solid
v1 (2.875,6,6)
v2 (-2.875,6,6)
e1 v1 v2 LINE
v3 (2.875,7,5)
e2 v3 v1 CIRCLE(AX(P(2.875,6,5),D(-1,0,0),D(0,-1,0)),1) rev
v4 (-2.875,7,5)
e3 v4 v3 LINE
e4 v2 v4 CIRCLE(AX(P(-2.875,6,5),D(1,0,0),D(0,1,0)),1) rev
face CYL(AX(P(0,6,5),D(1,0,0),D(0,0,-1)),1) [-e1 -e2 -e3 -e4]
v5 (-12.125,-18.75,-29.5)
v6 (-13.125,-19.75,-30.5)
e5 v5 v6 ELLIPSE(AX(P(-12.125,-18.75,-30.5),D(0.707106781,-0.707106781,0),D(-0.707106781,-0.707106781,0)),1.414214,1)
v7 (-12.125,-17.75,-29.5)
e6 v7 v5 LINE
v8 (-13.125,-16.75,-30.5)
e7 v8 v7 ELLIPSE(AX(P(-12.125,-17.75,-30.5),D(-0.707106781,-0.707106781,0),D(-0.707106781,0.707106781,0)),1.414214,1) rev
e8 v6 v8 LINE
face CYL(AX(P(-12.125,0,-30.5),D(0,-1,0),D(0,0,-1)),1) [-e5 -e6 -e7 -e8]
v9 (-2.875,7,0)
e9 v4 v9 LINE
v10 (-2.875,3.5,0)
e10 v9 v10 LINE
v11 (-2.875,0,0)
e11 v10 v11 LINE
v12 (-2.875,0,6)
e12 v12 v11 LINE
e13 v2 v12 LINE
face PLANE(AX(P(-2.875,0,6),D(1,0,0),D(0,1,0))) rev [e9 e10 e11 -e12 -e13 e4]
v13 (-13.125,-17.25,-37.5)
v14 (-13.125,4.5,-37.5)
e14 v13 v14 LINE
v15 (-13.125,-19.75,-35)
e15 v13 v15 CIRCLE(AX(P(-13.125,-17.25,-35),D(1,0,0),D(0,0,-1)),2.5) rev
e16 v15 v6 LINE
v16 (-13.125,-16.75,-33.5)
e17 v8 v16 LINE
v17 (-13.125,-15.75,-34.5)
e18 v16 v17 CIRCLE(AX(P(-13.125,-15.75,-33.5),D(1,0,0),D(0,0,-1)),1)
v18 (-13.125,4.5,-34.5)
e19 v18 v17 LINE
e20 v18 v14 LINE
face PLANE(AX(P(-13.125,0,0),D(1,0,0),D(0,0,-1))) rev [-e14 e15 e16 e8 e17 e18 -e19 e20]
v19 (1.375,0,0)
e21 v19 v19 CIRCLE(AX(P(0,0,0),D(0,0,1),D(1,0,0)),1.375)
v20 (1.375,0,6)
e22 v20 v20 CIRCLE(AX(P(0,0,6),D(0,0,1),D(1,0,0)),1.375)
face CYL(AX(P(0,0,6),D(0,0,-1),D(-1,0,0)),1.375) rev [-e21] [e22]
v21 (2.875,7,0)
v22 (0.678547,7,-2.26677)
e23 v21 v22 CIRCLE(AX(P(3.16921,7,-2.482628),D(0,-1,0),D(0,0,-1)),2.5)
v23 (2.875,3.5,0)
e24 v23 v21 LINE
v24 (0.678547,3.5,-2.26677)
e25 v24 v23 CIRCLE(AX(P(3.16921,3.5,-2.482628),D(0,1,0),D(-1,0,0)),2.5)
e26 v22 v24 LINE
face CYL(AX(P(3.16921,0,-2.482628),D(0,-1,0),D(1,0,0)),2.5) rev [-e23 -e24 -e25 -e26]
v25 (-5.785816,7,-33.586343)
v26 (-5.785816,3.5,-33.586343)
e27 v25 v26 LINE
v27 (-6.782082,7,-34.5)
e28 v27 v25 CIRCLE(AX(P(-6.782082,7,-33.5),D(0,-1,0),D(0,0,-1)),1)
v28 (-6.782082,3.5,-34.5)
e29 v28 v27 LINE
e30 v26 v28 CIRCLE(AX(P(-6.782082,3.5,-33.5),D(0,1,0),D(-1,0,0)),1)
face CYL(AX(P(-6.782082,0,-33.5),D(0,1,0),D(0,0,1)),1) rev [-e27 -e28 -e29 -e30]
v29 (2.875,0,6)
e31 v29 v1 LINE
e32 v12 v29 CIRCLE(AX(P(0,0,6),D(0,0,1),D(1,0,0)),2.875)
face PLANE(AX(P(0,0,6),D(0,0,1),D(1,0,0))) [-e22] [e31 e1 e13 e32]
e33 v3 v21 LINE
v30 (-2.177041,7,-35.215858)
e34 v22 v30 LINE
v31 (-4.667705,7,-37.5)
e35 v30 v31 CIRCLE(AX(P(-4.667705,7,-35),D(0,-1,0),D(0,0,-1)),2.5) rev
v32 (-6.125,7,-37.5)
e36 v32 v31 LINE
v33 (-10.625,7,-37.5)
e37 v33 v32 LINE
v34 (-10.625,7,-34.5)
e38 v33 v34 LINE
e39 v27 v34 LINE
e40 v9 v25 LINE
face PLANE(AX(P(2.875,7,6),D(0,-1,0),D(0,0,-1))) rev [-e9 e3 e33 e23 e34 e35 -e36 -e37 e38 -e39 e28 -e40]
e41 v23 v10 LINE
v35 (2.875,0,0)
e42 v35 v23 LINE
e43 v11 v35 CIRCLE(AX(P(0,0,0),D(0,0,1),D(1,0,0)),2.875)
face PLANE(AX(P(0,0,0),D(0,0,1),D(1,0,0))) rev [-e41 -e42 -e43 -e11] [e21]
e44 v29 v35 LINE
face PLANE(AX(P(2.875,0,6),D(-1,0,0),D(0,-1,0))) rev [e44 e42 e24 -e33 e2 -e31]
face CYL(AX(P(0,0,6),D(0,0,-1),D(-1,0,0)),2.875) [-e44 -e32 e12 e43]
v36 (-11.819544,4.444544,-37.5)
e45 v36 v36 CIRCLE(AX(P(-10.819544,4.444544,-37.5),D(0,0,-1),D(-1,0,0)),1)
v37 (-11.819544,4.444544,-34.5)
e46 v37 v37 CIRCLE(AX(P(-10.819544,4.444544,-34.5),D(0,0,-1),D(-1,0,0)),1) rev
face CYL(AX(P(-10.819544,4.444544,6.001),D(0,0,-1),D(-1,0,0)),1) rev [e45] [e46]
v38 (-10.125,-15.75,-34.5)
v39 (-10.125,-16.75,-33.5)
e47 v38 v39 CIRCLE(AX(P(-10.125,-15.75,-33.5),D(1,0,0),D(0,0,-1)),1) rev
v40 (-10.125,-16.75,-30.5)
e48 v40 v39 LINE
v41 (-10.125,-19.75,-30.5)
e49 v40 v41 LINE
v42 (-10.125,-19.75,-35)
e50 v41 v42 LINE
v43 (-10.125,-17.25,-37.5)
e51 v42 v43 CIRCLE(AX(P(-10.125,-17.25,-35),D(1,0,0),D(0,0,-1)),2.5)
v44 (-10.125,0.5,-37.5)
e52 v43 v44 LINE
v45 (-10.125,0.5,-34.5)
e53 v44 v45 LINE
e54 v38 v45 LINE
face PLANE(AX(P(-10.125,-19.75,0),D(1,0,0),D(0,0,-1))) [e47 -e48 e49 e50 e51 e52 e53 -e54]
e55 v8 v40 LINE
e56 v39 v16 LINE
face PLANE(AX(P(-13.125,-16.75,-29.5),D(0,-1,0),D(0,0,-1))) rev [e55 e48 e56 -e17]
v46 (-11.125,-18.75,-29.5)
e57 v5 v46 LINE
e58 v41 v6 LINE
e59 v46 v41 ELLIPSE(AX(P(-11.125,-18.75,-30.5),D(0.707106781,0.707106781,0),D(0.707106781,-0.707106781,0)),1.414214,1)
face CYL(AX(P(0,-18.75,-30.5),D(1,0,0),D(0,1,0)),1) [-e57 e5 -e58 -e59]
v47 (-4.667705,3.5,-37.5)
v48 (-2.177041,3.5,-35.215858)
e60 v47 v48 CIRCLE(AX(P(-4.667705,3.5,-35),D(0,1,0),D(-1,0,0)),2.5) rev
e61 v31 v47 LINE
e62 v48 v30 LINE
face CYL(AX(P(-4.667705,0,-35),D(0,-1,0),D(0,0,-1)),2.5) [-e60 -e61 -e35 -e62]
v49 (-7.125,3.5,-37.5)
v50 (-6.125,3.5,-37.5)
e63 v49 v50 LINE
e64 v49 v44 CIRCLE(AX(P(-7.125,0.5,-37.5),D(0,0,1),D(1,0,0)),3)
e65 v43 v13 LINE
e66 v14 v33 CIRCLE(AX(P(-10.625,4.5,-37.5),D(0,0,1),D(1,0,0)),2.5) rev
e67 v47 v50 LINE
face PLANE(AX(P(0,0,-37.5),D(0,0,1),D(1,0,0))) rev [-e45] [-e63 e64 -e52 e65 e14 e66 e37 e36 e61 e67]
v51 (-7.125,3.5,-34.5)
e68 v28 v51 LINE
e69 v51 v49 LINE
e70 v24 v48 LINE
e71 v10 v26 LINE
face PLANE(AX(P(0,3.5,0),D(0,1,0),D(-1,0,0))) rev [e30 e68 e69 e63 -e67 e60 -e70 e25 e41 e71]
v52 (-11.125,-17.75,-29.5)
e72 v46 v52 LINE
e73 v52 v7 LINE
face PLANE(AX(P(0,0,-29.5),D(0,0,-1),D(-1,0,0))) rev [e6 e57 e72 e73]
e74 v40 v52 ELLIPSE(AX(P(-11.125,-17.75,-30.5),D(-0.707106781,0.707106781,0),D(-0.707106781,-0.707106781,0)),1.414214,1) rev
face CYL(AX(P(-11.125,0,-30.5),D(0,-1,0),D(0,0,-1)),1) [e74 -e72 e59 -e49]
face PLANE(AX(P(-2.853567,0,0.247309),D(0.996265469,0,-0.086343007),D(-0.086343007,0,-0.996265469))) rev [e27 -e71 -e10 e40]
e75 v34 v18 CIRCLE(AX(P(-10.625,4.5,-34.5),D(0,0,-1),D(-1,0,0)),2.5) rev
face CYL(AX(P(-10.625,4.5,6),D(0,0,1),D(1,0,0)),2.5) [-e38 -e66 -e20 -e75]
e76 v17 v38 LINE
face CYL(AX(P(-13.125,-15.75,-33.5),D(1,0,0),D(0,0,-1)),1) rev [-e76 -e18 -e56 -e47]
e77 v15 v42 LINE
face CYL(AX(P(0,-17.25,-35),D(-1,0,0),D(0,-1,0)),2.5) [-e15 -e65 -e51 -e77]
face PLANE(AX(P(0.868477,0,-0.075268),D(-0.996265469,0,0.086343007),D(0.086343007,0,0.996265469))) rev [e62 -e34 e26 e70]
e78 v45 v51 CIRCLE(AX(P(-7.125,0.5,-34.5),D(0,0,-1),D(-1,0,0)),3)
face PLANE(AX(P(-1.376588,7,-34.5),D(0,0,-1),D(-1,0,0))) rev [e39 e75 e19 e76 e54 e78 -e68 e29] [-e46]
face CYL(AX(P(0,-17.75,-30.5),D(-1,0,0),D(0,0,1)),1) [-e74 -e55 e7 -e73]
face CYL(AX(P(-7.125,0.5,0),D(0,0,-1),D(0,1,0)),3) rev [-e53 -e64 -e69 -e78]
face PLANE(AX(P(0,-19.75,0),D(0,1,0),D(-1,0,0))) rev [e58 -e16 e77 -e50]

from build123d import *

# Parameters (mm, degrees)
SKETCH1_R           = 1.375
BOSS_EXTRUDE1_DEPTH = 6
BOSS_EXTRUDE2_START = -13.125
SKETCH9_W           = 3.5
SKETCH9_H           = 3
BOSS_EXTRUDE2_DEPTH = 7.26
BOSS_EXTRUDE3_START = -3.5
SKETCH10_W          = 3
SKETCH10_H          = 3
BOSS_EXTRUDE3_DEPTH = 23.25
SKETCH11_W          = 3
SKETCH11_H          = 3
BOSS_EXTRUDE4_DEPTH = 5
FILLET1_R           = 2.5
FILLET2_R           = 1
FILLET3_R           = 3
CUT_EXTRUDE1_REACH  = 51.544
SKETCH12_R          = 1


with BuildPart() as part:
    # Sketch1 → Boss-Extrude1 (new body)
    with BuildSketch(Plane(origin=(0, 0, 0), x_dir=(0, 1, 0), z_dir=(0, 0, 1))):
        with BuildLine():
            Line((0, 2.875), (7, 2.875))
            Line((7, 2.875), (7, -2.875))
            Line((7, -2.875), (0, -2.875))
            ThreePointArc((0, -2.875), (-2.875, 0), (0, 2.875))
        make_face()
        with Locations(Location((0, 0, 0), (0, 0, 270))):
            Circle(SKETCH1_R, mode=Mode.SUBTRACT)
    extrude(amount=BOSS_EXTRUDE1_DEPTH)

    # Sketch2 → Loft1 section 0
    with BuildSketch(Plane(origin=(0, 0, 0), x_dir=(1, 0, 0), z_dir=(0, 0, -1))):
        with BuildLine():
            Line((0.875, -7), (-2.875, -7))
            Line((-2.875, -7), (-2.875, -3.5))
            Line((-2.875, -3.5), (0.875, -3.5))
            Line((0.875, -3.5), (0.875, -7))
        make_face()
    # Sketch8 → Loft1 section 1
    with BuildSketch(Plane(origin=(0, 0, -37.5), x_dir=(-1, 0, 0), z_dir=(0, 0, -1))):
        with BuildLine():
            Line((2.375, 3.5), (2.375, 7))
            Line((2.375, 7), (6.125, 7))
            Line((6.125, 7), (6.125, 3.5))
            Line((6.125, 3.5), (2.375, 3.5))
        make_face()
    loft()

    # Sketch9 → Boss-Extrude2 (add)
    with BuildSketch(Plane.YZ.offset(BOSS_EXTRUDE2_START)):
        with Locations((5.25, -36)):
            Rectangle(SKETCH9_W, SKETCH9_H)
    extrude(amount=BOSS_EXTRUDE2_DEPTH)

    # Sketch10 → Boss-Extrude3 (add)
    with BuildSketch(Plane(origin=(0, 7, 0), x_dir=(-1, 0, 0), z_dir=(0, 1, 0)).offset(BOSS_EXTRUDE3_START)):
        with Locations((11.625, -36)):
            Rectangle(SKETCH10_W, SKETCH10_H)
    extrude(amount=-BOSS_EXTRUDE3_DEPTH)

    # Sketch11 → Boss-Extrude4 (add)
    with BuildSketch(Plane.XY.offset(-34.5)):
        with Locations((-11.625, -18.25)):
            Rectangle(SKETCH11_W, SKETCH11_H)
    extrude(amount=BOSS_EXTRUDE4_DEPTH)

    # Fillet1
    # the kernel refuses this fillet: 2.5 mm, written as the material it adds along each edge
    with BuildSketch(Plane(origin=(0.875, 3.5, 0), x_dir=(-0.08634300732914678, 0, -0.9962654691824658), z_dir=(0, 1, 0))) as fillet1_piece_1:
        with BuildLine():
            CenterArc((2.275267243, -2.5), FILLET1_R, 90, 78.288278187)
            Line((-0.172686015, -1.992530938), (0, 0))
            Line((0, 0), (2.275267243, 0))
        make_face()
    extrude(amount=3.5)
    # the kernel refuses this fillet: 2.5 mm, written as the material it takes off along each edge
    with BuildSketch(Plane(origin=(-19.375, -19.75, -37.5), x_dir=(0, 0, 1), z_dir=(1, 0, 0))) as fillet1_2_piece_1:
        with BuildLine():
            CenterArc((FILLET1_R, -FILLET1_R), FILLET1_R, 90, 90)
            Line((0, -FILLET1_R), (0, 0))
            Line((0, 0), (FILLET1_R, 0))
        make_face()
    extrude(amount=15.5, mode=Mode.SUBTRACT)
    with BuildSketch(Plane(origin=(-2.375, -2.231761645, -37.5), x_dir=(-1, 0, 0), z_dir=(0, 1, 0))) as fillet1_2_piece_2:
        with BuildLine():
            CenterArc((FILLET1_R * 0.917081863151, FILLET1_R), FILLET1_R, 184.953257478, 85.046742522)
            Line((-FILLET1_R * 0.0791836060315, FILLET1_R * 0.913656992671), (0, 0))
            Line((0, 0), (FILLET1_R * 0.917081863151, 0))
        make_face()
    extrude(amount=14.963523289, mode=Mode.SUBTRACT)
    with BuildSketch(Plane(origin=(-13.125, 7, -43.75), x_dir=(0, -1, 0), z_dir=(0, 0, 1))) as fillet1_2_piece_3:
        with BuildLine():
            CenterArc((FILLET1_R, FILLET1_R), FILLET1_R, 180, 90)
            Line((0, FILLET1_R), (0, 0))
            Line((0, 0), (FILLET1_R, 0))
        make_face()
    extrude(amount=15.5, mode=Mode.SUBTRACT)

    # Fillet2
    fillet2_edges = [part.edges().sort_by_distance(p)[0] for p in [
        (0, 7, 6),
        (-5.865, 5.25, -34.5),
        (-11.625, -16.75, -34.5),
        (-11.625, -16.75, -29.5),
        (-13.125, -18.25, -29.5),
        (-11.625, -19.75, -29.5),
        (-10.125, -18.25, -29.5),
    ]]
    fillet(fillet2_edges, radius=FILLET2_R)

    # Fillet3
    fillet3_edges = [part.edges().sort_by_distance(p)[0] for p in [
        (-10.125, 3.5, -36),
    ]]
    fillet(fillet3_edges, radius=FILLET3_R)

    # Sketch12 → Cut-Extrude1 (cut, up to next)
    with BuildSketch(Plane(origin=(0, 0, -37.5), x_dir=(1, 0, 0), z_dir=(0, 0, -1)), mode=Mode.PRIVATE) as cut_extrude1_sk1:
        with Locations(Location((-10.819543648, -4.444543648, 0), (0, 0, 180))):
            Circle(SKETCH12_R)
    cut_extrude1_tool1 = extrude(cut_extrude1_sk1.sketch, amount=-CUT_EXTRUDE1_REACH, mode=Mode.PRIVATE) & part.part
    add(cut_extrude1_tool1.solids().sort_by_distance((-10.819544, 4.444544, -37.5))[0], mode=Mode.SUBTRACT)


solid = part.part
